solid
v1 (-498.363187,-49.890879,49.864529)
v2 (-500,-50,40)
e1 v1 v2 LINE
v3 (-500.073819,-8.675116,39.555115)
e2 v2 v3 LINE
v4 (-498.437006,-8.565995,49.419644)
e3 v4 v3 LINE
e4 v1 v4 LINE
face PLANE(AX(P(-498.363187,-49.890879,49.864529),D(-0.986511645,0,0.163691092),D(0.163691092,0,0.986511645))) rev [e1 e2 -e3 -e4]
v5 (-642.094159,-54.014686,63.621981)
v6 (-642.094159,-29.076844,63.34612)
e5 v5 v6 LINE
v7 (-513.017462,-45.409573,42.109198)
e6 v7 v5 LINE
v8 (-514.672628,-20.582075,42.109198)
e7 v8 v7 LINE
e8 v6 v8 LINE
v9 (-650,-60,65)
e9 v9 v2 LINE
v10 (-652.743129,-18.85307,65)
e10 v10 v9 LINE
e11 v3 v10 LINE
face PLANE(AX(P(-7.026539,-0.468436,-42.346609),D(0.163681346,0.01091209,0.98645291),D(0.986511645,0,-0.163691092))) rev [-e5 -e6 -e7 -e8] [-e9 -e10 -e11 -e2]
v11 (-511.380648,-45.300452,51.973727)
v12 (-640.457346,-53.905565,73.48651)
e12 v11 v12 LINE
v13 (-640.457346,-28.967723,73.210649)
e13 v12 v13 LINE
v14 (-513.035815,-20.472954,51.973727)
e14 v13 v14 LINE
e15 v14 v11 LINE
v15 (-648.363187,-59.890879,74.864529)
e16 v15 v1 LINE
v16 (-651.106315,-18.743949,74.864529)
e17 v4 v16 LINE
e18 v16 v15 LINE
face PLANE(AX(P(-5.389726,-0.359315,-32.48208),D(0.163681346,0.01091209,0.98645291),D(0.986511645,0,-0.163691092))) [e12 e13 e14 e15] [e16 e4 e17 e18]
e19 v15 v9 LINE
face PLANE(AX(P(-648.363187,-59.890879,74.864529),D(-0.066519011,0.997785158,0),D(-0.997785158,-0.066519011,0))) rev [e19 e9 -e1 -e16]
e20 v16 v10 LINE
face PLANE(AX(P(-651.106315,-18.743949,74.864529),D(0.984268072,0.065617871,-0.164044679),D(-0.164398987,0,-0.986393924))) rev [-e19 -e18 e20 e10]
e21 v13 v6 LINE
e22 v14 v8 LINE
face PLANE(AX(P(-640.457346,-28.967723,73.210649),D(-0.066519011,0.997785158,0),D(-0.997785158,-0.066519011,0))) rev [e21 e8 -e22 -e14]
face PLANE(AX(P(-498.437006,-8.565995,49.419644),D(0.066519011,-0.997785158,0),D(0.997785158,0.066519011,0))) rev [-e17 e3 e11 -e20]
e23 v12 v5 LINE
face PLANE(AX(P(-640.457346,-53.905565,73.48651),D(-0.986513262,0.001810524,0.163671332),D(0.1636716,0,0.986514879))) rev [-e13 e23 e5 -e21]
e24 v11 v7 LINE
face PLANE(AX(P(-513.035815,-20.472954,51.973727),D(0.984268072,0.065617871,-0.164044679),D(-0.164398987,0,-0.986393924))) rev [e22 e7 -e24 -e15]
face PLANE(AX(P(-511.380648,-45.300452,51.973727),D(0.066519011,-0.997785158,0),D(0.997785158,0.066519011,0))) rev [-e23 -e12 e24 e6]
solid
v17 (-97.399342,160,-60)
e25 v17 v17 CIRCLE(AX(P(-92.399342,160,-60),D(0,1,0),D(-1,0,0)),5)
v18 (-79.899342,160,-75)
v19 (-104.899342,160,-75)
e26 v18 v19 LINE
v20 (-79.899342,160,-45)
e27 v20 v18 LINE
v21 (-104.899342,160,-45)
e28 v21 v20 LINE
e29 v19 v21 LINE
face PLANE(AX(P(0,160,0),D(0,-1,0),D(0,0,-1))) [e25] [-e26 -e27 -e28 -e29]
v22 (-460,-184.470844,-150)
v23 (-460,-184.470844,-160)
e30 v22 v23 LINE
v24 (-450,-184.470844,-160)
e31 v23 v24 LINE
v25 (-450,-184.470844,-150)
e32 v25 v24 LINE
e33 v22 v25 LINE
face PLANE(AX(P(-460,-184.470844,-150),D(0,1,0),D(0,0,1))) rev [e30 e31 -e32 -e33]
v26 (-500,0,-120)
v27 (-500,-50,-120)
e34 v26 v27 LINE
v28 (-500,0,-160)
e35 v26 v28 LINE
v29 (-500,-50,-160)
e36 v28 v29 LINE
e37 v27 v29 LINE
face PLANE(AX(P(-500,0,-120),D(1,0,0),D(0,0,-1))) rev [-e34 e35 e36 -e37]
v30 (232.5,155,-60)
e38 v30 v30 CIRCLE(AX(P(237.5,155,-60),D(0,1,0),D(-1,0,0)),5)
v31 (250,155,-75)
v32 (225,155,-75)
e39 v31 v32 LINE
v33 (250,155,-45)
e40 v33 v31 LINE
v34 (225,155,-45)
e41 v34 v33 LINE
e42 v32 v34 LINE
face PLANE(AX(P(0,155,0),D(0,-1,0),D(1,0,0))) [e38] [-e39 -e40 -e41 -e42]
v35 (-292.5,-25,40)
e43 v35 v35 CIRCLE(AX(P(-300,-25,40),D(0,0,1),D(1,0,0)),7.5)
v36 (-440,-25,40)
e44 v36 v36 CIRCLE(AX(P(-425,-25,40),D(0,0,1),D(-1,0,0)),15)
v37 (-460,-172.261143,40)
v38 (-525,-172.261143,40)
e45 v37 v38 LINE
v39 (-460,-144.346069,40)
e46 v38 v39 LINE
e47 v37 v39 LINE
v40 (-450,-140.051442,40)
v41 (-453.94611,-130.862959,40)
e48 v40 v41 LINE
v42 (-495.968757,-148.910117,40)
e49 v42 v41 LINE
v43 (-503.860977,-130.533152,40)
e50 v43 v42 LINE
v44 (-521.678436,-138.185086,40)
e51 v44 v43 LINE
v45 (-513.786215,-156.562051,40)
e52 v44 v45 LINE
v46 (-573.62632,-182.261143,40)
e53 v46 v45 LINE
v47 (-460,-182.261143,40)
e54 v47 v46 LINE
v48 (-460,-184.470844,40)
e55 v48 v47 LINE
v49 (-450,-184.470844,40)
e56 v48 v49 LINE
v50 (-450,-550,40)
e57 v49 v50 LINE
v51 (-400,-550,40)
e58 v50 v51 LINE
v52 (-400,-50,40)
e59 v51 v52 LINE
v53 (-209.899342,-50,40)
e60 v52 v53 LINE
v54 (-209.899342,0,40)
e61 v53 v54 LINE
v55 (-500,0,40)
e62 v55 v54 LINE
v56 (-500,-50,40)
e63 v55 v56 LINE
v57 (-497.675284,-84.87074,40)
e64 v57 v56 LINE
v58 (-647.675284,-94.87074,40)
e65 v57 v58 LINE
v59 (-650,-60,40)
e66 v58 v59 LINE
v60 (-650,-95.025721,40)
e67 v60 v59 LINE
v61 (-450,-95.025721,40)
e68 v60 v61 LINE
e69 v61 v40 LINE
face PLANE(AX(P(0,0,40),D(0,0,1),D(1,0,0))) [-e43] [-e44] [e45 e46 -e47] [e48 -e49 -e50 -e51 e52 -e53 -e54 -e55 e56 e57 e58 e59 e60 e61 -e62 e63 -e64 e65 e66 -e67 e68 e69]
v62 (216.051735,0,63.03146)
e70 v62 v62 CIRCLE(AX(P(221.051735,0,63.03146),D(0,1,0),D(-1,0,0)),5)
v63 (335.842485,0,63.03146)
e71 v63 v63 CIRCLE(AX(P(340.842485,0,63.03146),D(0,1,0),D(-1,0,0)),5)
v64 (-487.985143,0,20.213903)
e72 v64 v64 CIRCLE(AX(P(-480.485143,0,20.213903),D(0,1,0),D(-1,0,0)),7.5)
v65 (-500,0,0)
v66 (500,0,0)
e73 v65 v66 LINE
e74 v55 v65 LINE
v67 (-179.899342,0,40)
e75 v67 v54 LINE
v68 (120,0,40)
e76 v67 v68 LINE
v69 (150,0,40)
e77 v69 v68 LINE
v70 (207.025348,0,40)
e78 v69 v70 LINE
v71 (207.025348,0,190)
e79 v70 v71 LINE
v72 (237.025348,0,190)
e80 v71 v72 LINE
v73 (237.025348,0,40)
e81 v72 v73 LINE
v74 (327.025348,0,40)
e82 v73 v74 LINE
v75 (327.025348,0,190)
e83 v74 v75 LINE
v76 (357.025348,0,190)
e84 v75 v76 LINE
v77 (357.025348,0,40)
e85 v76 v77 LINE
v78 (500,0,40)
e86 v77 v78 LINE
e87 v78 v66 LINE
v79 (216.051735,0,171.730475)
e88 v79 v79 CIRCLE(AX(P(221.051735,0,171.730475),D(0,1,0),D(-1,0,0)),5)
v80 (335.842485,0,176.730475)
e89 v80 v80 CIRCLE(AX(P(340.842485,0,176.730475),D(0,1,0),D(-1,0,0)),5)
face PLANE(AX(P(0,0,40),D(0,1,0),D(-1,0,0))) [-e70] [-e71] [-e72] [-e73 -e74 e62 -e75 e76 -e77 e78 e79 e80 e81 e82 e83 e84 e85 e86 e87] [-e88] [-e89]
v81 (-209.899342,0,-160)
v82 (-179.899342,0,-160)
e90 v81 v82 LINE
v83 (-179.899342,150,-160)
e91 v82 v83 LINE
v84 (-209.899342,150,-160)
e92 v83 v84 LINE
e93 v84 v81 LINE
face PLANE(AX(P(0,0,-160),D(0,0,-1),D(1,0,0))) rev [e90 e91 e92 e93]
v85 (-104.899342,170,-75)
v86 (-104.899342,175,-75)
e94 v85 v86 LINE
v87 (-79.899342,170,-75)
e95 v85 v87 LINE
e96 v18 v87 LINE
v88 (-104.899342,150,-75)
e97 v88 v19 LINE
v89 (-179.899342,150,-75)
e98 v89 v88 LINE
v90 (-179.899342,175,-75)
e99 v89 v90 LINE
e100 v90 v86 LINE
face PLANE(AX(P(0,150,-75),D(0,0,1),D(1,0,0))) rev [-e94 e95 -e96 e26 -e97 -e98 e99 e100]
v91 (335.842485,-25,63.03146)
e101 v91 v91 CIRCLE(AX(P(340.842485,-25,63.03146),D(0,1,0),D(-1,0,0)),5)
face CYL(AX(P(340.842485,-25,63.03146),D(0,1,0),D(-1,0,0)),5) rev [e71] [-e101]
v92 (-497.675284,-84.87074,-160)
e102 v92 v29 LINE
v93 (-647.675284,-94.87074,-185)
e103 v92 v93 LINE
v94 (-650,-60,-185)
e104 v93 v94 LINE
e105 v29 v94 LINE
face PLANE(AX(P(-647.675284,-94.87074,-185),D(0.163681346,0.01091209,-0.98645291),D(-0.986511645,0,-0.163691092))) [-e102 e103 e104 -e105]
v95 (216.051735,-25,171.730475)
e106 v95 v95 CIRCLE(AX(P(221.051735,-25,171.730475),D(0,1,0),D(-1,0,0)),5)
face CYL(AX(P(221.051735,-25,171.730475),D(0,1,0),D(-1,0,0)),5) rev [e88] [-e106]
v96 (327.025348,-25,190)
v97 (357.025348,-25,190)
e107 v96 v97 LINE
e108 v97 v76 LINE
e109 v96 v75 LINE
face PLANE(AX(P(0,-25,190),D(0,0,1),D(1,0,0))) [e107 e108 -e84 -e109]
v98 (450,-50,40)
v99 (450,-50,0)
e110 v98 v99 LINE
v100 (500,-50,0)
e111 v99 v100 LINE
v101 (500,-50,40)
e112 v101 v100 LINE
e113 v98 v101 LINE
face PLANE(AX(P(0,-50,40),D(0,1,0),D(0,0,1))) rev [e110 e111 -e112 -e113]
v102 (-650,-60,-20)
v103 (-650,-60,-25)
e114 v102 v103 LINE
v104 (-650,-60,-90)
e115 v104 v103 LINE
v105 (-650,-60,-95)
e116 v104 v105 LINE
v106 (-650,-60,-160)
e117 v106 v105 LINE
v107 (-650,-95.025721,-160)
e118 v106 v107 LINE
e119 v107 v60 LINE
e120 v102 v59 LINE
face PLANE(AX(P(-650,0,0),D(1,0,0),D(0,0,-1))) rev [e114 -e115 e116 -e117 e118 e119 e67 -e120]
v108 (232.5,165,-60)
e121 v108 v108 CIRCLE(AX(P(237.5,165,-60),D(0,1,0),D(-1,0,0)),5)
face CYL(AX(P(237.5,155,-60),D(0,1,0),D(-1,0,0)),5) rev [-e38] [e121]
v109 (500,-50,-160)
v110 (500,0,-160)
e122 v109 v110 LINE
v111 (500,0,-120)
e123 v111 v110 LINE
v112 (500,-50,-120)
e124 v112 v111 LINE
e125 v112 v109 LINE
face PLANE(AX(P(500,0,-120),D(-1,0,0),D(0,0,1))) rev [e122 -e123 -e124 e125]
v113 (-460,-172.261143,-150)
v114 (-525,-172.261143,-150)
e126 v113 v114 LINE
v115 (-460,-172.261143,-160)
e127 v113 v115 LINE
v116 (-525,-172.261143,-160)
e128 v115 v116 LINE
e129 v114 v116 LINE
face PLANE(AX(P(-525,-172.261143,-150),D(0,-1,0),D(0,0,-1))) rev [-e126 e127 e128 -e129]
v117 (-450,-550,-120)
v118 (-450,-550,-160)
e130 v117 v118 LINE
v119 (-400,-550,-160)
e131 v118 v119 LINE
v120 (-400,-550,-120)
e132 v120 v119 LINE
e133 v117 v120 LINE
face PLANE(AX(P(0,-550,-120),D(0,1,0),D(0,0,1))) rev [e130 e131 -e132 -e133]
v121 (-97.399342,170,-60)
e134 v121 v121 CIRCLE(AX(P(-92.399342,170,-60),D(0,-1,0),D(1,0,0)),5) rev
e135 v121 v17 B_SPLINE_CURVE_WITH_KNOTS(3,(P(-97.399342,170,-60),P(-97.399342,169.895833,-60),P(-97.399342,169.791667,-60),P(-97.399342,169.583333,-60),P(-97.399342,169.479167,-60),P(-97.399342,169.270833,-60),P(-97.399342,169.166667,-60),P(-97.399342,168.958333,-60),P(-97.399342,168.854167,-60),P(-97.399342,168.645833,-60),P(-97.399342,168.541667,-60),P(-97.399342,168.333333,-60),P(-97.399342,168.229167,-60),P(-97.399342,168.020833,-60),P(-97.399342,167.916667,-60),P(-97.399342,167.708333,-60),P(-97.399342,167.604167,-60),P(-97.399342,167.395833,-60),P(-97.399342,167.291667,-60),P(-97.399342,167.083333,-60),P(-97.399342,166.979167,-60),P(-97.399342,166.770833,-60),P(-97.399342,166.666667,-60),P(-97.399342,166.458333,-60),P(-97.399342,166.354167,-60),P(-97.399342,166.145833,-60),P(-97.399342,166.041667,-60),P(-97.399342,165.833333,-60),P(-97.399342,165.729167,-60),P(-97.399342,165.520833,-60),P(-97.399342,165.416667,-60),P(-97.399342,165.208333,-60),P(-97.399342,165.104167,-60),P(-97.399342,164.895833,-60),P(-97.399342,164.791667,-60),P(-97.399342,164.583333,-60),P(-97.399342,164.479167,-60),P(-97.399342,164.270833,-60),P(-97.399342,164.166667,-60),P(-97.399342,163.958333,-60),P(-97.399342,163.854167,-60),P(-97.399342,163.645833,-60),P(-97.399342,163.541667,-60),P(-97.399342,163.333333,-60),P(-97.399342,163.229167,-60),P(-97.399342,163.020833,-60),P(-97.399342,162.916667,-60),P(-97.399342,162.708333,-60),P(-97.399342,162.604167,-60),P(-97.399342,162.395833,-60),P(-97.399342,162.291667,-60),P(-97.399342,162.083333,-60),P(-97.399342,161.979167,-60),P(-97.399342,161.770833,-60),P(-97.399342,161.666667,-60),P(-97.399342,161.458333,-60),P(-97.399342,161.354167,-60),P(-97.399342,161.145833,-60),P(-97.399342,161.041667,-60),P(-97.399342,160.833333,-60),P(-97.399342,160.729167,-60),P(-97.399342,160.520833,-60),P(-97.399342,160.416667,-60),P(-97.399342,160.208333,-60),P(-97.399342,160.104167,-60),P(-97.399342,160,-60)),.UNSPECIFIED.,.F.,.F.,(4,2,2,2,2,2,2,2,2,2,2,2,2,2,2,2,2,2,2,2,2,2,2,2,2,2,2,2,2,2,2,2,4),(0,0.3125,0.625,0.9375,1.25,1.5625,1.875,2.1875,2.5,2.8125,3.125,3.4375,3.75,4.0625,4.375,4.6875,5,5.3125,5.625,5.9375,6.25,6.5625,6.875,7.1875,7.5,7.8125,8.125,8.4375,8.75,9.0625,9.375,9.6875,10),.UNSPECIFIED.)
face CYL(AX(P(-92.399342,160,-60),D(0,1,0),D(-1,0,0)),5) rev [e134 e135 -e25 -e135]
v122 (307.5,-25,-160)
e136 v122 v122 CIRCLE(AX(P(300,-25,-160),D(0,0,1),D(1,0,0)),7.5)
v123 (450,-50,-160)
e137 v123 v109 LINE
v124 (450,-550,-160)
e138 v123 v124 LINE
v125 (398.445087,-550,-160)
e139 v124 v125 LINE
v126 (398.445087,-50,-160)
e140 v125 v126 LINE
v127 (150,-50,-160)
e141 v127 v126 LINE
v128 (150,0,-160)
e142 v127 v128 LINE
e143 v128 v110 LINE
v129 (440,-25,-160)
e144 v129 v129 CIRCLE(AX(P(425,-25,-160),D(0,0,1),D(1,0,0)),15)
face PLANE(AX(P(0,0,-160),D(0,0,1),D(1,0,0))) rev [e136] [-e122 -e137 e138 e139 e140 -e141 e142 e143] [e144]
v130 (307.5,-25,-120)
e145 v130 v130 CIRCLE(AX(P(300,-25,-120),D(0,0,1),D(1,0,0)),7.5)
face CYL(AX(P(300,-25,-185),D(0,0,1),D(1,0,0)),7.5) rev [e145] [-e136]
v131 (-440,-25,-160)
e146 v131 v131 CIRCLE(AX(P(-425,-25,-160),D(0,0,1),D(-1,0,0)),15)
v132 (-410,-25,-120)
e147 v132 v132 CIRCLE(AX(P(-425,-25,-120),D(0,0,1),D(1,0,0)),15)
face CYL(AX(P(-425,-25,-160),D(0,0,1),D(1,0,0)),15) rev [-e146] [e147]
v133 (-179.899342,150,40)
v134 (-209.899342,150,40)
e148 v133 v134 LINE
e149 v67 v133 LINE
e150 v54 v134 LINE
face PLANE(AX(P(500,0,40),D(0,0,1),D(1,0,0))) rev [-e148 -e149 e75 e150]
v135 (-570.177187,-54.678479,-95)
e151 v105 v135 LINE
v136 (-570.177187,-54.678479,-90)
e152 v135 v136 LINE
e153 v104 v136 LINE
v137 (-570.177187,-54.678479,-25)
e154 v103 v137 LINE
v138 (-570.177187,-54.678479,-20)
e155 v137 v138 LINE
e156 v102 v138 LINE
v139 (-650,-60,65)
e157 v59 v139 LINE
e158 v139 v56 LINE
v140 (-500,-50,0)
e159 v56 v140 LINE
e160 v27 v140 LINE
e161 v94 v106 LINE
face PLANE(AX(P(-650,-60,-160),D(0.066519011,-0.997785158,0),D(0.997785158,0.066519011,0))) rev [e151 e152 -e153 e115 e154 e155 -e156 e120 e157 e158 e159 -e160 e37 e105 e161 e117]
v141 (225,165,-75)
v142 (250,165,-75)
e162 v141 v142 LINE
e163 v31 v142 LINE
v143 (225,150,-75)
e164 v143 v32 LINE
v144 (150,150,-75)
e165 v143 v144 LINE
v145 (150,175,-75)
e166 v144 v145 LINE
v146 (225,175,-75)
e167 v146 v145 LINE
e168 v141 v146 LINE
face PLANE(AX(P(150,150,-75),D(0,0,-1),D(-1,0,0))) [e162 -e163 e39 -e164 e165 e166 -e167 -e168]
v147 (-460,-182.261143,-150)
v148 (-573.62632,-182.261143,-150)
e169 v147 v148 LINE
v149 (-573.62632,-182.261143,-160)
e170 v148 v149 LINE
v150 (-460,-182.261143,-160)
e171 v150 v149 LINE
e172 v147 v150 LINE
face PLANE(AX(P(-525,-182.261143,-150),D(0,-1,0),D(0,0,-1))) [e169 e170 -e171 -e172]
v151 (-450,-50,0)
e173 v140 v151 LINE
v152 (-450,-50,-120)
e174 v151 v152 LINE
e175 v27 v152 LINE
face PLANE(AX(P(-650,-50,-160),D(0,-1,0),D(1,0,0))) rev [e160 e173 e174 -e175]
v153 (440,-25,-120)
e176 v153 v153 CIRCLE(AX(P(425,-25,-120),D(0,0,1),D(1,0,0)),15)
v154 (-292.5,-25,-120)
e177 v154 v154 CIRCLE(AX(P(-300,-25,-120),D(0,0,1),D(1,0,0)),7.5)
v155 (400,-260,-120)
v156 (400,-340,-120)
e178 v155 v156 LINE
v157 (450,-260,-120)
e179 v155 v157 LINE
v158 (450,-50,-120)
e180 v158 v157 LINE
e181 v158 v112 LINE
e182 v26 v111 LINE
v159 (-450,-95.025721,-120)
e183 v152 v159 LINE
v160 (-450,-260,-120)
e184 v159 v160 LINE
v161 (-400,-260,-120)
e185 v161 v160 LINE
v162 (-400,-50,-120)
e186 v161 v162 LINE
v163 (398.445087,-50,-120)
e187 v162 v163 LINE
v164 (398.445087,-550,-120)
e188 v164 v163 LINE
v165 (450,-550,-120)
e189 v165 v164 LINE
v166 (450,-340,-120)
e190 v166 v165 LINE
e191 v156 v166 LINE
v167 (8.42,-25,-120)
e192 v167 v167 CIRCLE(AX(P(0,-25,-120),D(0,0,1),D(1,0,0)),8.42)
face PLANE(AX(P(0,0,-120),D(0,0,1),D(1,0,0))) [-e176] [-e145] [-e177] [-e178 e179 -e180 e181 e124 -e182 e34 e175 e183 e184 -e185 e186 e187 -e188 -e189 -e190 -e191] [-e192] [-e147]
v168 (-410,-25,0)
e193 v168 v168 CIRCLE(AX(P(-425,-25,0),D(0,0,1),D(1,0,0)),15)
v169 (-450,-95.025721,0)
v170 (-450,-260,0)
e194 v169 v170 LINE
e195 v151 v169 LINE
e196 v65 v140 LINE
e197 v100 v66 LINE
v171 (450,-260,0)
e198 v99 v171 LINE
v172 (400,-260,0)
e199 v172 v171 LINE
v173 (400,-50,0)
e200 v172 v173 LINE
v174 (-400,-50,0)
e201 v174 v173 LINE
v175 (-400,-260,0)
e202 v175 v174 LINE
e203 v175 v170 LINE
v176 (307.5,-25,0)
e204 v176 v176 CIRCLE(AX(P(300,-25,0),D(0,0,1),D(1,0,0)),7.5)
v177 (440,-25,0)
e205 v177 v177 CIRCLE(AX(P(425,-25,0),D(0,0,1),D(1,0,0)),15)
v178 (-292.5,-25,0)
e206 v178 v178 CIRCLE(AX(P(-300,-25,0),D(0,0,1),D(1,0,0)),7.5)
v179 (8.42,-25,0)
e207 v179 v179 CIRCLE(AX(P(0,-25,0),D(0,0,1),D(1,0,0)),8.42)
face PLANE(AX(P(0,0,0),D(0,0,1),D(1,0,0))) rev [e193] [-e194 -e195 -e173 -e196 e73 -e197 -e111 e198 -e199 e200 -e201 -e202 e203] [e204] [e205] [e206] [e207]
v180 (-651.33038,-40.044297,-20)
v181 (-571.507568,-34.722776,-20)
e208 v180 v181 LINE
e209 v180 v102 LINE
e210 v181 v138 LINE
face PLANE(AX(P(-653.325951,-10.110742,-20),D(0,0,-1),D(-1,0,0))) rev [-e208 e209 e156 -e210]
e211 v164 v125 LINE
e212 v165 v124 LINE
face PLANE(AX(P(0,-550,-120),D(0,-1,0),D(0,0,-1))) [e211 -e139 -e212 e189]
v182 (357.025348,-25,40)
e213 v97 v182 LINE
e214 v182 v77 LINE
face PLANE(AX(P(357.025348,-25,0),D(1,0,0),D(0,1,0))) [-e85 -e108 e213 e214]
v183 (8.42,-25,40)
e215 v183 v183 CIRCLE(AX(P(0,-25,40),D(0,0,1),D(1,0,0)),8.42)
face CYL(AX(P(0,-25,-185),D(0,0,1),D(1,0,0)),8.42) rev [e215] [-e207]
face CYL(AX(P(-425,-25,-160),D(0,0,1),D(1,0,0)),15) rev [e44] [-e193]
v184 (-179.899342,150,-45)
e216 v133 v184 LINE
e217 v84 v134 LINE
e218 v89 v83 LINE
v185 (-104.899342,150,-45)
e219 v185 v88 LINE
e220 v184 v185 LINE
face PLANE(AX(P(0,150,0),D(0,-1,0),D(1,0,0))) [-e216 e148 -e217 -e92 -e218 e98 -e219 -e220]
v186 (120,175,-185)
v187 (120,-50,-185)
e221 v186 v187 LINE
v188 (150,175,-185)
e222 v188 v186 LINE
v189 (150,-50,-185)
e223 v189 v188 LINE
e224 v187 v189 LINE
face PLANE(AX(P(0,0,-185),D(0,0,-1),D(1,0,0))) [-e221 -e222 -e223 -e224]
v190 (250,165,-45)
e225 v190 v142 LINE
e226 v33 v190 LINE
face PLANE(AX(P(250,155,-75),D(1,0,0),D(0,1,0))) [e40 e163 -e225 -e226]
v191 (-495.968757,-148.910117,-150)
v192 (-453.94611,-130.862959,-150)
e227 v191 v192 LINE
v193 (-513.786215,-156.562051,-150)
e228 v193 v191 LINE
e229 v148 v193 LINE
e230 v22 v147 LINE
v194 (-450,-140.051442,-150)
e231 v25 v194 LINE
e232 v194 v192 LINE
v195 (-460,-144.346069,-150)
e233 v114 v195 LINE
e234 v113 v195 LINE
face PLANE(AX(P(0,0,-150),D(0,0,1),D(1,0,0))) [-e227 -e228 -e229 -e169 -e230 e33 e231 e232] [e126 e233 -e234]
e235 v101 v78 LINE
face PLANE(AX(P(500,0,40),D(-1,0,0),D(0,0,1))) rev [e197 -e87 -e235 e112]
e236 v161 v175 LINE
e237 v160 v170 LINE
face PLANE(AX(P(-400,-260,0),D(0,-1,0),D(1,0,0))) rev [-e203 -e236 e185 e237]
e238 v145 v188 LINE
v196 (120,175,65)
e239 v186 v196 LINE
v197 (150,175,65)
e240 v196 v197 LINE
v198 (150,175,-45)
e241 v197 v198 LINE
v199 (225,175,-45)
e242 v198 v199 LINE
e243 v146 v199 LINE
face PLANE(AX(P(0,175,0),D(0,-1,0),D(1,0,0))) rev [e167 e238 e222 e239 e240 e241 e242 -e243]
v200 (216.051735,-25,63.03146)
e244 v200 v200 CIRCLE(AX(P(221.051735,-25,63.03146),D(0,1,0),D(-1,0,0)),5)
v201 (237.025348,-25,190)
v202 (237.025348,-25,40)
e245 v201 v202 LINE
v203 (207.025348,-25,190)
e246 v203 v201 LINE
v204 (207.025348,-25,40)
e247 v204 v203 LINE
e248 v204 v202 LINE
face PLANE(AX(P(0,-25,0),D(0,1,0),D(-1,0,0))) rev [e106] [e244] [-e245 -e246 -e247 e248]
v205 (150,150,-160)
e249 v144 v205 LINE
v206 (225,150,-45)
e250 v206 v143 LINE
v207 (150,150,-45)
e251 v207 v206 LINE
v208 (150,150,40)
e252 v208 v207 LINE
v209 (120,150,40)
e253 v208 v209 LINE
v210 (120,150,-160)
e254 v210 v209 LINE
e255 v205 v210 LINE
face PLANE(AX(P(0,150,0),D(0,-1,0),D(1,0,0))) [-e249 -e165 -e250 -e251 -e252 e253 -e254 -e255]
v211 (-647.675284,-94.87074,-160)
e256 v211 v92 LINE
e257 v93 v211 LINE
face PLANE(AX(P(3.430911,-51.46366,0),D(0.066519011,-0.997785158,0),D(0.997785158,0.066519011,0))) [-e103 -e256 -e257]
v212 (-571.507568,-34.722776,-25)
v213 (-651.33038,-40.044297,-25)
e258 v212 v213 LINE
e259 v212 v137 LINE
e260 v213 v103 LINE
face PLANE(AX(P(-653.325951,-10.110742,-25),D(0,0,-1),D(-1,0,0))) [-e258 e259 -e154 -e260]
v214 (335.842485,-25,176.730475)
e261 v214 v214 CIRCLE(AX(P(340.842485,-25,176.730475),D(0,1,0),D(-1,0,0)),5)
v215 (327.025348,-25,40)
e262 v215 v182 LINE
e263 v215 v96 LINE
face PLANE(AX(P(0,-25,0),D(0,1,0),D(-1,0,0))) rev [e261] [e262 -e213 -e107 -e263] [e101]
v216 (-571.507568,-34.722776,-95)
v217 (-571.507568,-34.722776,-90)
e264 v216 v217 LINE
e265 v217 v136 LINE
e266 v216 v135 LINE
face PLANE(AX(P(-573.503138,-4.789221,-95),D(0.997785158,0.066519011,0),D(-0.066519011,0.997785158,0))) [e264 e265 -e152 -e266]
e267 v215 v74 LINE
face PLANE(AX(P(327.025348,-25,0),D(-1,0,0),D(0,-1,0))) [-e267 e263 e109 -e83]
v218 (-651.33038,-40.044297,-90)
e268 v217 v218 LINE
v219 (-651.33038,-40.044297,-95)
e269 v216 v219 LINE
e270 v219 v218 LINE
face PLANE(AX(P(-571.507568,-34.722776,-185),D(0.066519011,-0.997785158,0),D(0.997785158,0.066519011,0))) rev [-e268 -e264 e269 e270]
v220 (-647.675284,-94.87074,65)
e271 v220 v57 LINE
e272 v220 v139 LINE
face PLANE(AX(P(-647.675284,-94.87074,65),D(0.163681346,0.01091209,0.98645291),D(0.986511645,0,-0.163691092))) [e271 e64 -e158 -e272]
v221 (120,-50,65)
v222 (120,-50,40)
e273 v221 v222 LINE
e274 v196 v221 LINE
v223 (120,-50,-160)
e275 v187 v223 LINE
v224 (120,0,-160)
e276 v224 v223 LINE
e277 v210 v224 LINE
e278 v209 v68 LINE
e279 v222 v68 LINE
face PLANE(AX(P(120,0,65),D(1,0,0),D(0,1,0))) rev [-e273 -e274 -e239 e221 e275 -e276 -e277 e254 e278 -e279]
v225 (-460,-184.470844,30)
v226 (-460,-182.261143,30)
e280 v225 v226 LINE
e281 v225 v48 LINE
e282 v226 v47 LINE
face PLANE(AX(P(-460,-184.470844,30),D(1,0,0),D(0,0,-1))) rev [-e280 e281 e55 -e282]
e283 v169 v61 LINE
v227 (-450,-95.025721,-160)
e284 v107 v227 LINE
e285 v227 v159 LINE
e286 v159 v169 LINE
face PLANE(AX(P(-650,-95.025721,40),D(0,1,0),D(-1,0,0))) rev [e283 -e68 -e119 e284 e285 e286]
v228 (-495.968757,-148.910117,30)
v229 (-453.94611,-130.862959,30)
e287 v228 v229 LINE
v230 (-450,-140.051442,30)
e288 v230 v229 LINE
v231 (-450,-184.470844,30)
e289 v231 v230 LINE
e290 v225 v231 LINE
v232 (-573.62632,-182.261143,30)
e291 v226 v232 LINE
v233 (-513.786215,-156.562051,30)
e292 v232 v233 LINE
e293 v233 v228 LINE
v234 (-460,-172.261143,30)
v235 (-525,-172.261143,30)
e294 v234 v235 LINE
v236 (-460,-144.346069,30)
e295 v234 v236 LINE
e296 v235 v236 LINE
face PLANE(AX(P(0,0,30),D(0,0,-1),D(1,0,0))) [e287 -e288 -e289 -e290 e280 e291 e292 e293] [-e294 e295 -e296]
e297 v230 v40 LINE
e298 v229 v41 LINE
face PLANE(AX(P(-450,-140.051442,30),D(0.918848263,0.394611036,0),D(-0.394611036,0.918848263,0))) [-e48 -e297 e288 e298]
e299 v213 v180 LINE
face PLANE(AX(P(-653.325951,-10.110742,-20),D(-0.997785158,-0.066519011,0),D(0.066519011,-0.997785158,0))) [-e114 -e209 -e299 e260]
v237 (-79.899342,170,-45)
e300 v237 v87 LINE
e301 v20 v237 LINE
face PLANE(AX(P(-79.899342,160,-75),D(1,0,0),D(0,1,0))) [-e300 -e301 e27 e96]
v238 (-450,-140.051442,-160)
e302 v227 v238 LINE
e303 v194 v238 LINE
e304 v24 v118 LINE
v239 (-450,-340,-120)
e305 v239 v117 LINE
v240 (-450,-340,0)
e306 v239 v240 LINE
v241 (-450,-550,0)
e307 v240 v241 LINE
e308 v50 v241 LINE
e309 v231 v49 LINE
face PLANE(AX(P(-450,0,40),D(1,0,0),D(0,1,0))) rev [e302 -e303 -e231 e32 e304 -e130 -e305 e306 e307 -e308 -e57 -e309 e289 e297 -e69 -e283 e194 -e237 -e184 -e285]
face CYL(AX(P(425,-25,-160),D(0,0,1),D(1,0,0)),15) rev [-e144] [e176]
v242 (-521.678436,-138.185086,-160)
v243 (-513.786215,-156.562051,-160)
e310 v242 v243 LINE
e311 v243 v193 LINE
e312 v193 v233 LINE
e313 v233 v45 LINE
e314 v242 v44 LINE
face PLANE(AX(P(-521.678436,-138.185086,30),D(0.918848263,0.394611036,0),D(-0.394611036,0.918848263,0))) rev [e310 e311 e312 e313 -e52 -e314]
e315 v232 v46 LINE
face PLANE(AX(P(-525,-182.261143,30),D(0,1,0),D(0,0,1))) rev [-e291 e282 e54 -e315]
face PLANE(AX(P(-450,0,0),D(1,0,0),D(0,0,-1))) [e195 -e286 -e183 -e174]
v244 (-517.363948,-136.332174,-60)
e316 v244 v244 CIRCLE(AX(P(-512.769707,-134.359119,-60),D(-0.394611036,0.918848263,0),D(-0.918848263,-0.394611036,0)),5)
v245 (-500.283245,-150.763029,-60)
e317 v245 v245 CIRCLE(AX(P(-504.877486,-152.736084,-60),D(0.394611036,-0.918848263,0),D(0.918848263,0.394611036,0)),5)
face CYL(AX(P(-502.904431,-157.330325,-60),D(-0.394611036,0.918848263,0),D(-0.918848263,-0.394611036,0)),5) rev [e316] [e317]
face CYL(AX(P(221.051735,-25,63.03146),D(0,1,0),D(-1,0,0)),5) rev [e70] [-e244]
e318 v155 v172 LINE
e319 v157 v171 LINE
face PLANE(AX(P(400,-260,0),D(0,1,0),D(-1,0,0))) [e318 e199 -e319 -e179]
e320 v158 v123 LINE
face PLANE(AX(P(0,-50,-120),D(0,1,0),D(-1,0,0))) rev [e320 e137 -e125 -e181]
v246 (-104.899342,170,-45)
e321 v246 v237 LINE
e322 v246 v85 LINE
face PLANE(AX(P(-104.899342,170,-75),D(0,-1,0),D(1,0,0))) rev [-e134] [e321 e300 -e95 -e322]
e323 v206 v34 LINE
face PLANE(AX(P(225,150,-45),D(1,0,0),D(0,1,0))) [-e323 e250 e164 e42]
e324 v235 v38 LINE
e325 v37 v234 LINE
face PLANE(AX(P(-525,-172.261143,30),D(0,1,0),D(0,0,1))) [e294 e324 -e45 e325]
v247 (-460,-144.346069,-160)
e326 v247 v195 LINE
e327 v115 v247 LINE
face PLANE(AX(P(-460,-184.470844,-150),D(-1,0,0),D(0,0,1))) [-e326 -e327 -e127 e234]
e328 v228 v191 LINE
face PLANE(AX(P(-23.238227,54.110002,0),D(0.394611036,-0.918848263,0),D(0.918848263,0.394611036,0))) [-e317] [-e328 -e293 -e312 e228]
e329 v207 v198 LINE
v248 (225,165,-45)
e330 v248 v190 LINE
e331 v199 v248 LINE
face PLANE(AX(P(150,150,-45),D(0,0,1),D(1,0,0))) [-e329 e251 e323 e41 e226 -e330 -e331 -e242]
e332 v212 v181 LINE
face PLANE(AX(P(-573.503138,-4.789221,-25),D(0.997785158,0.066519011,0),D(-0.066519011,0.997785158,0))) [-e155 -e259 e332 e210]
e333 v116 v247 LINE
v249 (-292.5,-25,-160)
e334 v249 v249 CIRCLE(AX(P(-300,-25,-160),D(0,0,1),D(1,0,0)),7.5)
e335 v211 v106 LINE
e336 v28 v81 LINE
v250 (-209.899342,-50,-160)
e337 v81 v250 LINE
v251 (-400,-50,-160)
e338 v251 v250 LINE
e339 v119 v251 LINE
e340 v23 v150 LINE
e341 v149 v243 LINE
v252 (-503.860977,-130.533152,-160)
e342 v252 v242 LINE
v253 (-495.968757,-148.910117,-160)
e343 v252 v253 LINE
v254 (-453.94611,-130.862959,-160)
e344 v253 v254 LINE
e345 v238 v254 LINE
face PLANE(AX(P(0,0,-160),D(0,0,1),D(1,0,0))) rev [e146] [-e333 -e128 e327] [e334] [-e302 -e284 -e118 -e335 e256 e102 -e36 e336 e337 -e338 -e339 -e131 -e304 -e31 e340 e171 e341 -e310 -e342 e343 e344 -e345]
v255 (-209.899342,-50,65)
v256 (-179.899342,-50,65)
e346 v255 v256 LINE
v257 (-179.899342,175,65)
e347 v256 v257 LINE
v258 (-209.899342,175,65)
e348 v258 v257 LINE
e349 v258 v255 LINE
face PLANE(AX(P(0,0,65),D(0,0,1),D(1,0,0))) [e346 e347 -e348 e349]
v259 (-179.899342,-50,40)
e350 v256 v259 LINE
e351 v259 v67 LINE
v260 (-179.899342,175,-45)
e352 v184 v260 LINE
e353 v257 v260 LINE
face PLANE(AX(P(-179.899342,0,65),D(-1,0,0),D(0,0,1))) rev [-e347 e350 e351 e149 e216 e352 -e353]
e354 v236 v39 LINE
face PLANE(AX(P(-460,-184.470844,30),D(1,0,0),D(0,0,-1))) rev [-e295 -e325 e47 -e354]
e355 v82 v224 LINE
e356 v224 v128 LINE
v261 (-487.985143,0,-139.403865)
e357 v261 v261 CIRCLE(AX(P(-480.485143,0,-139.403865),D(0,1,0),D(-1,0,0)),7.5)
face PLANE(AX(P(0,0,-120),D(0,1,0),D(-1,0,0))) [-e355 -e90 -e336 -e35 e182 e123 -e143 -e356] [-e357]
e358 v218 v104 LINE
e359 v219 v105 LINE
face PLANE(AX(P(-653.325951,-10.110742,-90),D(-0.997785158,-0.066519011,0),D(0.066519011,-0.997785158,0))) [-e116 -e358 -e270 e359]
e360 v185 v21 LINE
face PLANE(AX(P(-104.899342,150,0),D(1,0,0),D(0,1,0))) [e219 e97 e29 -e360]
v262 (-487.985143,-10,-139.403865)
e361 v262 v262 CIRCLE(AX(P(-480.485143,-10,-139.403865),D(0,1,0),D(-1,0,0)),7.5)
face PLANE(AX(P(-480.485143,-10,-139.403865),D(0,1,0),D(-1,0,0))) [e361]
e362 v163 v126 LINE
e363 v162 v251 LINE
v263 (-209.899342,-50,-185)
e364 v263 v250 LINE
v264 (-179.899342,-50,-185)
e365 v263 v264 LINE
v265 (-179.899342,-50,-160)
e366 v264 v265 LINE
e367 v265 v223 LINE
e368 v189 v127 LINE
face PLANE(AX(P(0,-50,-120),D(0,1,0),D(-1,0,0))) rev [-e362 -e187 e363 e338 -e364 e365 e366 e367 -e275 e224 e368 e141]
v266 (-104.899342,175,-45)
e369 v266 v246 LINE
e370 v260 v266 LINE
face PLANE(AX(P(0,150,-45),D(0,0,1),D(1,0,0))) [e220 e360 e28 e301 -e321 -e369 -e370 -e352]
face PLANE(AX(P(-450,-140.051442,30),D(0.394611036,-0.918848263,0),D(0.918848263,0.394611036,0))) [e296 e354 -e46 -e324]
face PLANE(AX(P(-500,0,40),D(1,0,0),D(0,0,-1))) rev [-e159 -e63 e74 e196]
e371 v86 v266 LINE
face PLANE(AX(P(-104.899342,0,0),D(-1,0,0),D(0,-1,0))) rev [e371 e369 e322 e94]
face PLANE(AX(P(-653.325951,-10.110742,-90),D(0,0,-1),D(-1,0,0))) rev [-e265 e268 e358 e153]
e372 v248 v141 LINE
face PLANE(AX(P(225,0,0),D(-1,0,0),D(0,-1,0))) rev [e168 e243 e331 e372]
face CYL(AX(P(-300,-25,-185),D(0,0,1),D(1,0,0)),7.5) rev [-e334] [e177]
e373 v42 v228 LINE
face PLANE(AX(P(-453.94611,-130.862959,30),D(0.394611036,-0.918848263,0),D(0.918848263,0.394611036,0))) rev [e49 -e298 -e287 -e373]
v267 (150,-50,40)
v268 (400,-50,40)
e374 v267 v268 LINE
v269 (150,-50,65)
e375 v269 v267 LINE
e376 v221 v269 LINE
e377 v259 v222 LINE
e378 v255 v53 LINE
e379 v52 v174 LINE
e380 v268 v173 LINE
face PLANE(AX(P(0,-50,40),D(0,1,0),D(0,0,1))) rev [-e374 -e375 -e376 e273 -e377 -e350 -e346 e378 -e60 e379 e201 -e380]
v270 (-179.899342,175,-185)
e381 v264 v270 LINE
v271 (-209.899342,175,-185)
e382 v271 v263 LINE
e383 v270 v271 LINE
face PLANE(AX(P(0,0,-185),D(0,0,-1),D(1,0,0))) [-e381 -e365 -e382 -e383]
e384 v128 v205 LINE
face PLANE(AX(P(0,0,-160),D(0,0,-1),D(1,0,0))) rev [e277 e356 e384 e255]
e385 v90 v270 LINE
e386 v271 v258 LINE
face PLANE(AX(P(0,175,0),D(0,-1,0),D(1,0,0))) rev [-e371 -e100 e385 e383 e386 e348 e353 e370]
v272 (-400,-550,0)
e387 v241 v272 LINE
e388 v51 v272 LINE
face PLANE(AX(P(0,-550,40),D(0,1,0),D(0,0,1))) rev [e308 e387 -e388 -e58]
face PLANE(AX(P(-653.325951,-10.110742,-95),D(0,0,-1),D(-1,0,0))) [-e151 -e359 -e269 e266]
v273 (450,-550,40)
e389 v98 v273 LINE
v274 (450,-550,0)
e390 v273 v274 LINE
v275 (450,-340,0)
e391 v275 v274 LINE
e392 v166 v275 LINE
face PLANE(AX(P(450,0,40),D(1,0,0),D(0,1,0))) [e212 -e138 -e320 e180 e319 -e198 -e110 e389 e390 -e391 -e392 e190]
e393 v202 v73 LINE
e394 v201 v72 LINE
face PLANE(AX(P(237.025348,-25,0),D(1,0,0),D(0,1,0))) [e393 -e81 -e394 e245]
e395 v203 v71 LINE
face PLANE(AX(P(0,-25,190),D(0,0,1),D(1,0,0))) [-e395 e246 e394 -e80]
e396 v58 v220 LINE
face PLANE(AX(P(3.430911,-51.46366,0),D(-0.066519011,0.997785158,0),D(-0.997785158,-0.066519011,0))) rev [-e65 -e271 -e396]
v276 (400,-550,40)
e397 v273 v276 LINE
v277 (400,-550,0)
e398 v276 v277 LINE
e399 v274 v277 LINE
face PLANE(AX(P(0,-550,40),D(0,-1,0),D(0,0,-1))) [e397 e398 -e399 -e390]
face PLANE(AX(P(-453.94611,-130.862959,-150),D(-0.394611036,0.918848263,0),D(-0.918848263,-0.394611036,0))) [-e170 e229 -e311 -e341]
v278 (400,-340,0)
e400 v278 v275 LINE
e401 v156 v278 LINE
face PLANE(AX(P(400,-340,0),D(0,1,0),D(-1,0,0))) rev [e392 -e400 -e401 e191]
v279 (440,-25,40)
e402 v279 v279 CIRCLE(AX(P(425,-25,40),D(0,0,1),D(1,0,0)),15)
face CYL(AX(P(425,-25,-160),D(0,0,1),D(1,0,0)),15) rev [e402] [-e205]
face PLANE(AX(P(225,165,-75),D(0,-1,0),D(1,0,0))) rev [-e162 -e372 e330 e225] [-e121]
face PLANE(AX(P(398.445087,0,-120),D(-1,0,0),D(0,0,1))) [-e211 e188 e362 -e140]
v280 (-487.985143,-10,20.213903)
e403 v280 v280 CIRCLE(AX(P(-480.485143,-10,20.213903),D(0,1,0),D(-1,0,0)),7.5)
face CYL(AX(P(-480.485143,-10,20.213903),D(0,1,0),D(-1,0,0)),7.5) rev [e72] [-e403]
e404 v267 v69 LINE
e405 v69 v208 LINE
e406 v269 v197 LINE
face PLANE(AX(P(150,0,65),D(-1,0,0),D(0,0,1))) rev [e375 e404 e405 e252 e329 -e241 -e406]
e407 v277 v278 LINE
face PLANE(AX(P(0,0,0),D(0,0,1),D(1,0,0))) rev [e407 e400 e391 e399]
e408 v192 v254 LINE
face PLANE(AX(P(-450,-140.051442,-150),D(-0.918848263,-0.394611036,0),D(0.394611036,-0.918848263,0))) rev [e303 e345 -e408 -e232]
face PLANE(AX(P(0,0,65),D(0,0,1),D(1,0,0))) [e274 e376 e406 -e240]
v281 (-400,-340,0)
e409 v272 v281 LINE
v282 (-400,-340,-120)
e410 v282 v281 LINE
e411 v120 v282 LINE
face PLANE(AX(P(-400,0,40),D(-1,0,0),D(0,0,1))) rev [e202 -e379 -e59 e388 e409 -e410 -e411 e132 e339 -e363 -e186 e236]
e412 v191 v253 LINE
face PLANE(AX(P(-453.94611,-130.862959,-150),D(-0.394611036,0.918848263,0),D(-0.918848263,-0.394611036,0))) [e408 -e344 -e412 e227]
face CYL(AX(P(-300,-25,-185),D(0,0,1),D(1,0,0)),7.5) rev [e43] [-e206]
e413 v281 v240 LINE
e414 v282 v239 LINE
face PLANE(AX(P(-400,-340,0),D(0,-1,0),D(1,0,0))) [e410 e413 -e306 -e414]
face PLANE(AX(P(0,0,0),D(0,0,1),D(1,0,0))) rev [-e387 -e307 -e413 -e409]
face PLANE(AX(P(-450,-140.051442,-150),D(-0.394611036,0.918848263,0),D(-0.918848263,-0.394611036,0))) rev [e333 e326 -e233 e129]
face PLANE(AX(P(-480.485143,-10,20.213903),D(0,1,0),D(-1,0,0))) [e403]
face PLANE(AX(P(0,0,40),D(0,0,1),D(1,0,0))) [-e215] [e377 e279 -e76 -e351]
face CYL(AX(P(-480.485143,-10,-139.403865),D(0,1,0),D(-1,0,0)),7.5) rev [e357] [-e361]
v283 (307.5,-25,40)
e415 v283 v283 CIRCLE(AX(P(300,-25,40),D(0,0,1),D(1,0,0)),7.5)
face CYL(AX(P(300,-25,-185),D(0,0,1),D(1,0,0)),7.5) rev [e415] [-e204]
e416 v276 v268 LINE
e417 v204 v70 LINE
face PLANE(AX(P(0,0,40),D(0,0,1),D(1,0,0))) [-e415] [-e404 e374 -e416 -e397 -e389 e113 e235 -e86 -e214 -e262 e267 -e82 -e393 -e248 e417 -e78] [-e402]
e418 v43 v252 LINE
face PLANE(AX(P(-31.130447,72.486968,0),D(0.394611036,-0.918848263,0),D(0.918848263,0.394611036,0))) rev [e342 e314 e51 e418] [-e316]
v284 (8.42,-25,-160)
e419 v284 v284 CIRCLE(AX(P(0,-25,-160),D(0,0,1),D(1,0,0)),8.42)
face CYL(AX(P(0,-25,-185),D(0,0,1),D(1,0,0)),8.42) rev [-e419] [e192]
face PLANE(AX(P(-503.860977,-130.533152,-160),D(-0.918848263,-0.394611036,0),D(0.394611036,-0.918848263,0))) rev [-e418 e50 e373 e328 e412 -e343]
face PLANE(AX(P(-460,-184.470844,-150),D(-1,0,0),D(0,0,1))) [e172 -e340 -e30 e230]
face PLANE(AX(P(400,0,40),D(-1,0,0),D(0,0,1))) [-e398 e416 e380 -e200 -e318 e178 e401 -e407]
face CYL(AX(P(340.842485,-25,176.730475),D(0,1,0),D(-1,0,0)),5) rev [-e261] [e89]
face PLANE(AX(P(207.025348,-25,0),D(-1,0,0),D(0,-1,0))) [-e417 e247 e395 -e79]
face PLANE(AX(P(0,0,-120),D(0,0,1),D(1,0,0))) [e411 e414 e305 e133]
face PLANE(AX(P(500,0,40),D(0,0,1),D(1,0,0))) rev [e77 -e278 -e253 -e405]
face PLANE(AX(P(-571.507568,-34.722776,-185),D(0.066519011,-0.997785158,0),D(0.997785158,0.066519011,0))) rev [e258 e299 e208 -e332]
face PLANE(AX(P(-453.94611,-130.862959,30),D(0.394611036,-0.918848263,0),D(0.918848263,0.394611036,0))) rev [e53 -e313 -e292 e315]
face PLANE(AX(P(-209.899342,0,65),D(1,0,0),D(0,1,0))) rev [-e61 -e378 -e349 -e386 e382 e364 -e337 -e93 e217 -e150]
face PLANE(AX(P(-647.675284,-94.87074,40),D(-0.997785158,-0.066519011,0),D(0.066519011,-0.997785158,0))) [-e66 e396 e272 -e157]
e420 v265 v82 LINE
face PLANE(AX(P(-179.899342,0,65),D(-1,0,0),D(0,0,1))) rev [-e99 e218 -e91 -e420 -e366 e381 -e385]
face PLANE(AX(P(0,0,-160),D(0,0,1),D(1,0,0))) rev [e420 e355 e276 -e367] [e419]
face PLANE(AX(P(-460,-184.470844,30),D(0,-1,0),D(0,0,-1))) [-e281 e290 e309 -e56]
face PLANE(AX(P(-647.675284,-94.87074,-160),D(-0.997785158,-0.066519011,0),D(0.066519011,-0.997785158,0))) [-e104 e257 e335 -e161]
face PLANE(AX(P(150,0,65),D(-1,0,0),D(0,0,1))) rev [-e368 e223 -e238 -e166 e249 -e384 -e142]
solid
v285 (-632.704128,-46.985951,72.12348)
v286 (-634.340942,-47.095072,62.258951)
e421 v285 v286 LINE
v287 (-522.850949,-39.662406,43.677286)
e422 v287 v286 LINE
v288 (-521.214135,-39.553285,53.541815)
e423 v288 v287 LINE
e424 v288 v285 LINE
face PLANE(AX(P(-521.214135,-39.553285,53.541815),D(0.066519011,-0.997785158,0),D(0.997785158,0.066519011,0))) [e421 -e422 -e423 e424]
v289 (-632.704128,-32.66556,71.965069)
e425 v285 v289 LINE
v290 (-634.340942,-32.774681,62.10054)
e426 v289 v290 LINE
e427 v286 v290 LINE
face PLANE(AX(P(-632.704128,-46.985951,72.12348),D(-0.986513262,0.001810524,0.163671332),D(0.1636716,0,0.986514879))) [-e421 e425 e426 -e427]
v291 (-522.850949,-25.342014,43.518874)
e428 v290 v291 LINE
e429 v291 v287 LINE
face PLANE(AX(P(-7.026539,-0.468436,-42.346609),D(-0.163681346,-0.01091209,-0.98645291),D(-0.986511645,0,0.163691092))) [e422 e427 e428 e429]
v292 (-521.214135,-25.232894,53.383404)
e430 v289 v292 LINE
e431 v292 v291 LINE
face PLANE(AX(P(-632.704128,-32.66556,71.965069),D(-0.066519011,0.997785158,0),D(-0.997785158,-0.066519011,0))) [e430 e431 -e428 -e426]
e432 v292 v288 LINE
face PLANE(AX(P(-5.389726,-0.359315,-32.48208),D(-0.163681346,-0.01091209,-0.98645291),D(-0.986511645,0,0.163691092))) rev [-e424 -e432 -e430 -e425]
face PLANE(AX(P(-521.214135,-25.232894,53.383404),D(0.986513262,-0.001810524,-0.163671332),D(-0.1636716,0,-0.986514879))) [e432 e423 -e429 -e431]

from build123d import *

# Parameters (mm, degrees)
CROQUIS1_W                 = 1000
CROQUIS1_H                 = 50
CROQUIS1_W_2               = 50
CROQUIS1_H_2               = 500
SALIENTE_EXTRUIR1_DEPTH    = 40
CROQUIS3_W                 = 51.55491286
CROQUIS3_H                 = 500
CROQUIS3_W_2               = 1000
CROQUIS3_H_2               = 50
CROQUIS3_W_3               = 50
SALIENTE_EXTRUIR2_DEPTH    = 40
CROQUIS4_W                 = 120
CROQUIS4_H                 = 40
SALIENTE_EXTRUIR3_DEPTH    = 50
SIMETR_A5_START            = 400
SIMETR_A5_OUTLINE_W        = 80
SIMETR_A5_OUTLINE_H        = 120
SIMETR_A5_DEPTH            = 50
SIMETR_A5_START_2          = -450
SIMETR_A5_2_OUTLINE_W      = 40
SIMETR_A5_2_OUTLINE_H      = 120
SIMETR_A5_2_DEPTH          = 50
CROQUIS6_R                 = 15
CORTAR_EXTRUIR2_DEPTH      = 770.740215917
CROQUIS7_W                 = 30
CROQUIS7_H                 = 150
CROQUIS7_R                 = 5
SALIENTE_EXTRUIR7_DEPTH    = 25
CROQUIS8_W                 = 30
CROQUIS8_H                 = 150
CROQUIS8_H_2               = 50
SALIENTE_EXTRUIR8_DEPTH    = 25
SIMETR_A6_START            = -50
SIMETR_A6_OUTLINE_W        = 30
SIMETR_A6_OUTLINE_H        = 25
SIMETR_A6_DEPTH            = 200
CROQUIS9_W                 = 25
CROQUIS9_H                 = 150
CORTAR_EXTRUIR3_DEPTH      = 918.909077881
CROQUIS10_W                = 30
CROQUIS10_H                = 250
SALIENTE_EXTRUIR9_DEPTH    = 25
CROQUIS11_W                = 75
CROQUIS11_H                = 30
SALIENTE_EXTRUIR10_DEPTH   = 25
CROQUIS13_W                = 25
CROQUIS13_H                = 30
SALIENTE_EXTRUIR12_DEPTH   = 20
CROQUIS14_W                = 30
CROQUIS14_H                = 10
CORTAR_EXTRUIR5_DEPTH      = 25
CROQUIS15_R                = 5
CORTAR_EXTRUIR6_DEPTH      = 10
EXTRUIR_L_MINA1_START      = -10
EXTRUIR_L_MINA1_DEPTH      = 10
SALIENTE_EXTRUIR13_DEPTH   = 20
CROQUIS19_W                = 75
CROQUIS19_H                = 30
SALIENTE_EXTRUIR14_DEPTH   = 25
CROQUIS20_W                = 25
CROQUIS20_H                = 30
CROQUIS20_R                = 5
SALIENTE_EXTRUIR15_DEPTH   = 15
CROQUIS21_W                = 30
CROQUIS21_H                = 5
CORTAR_EXTRUIR7_DEPTH      = 25
CROQUIS22_R                = 5
CORTAR_EXTRUIR8_DEPTH      = 25
CROQUIS24_R                = 7.5
CROQUIS24_R_2              = 8.42
CORTAR_EXTRUIR9_DEPTH      = 826.937137629
CROQUIS25_W                = 200
CROQUIS25_H                = 45.025720895
SALIENTE_EXTRUIR16_DEPTH   = 200
CORTAR_EXTRUIR10_DEPTH     = 200
CROQUIS27_R                = 7.5
CORTAR_EXTRUIR11_DEPTH     = 10
SALIENTE_EXTRUIR17_DEPTH   = 34.948144
SALIENTE_EXTRUIR18_DEPTH   = 10
SALIENTE_EXTRUIR18_2_DEPTH = 10
CROQUIS31_W                = 80
CROQUIS31_H                = 5
EXTRUIR_L_MINA3_DEPTH      = 50
CORTAR_EXTRUIR12_DEPTH     = 880.451418574


# Read off the part's stored shape, not the designer's step: Simetría5, Simetría6, Extruir-Lámina1
with BuildPart() as part:
    # Croquis1 → Saliente-Extruir1 (new body)
    with BuildSketch(Plane.XY):
        with Locations((0, -25)):
            Rectangle(CROQUIS1_W, CROQUIS1_H)
        with Locations((-425, -300)):
            Rectangle(CROQUIS1_W_2, CROQUIS1_H_2)
        with Locations((425, -300)):
            Rectangle(CROQUIS1_W_2, CROQUIS1_H_2)
    extrude(amount=SALIENTE_EXTRUIR1_DEPTH)



with BuildPart() as body_2:
    # Croquis3 → Saliente-Extruir2 (new body)
    with BuildSketch(Plane.XY.offset(-160)):
        with Locations((424.22254357, -300)):
            Rectangle(CROQUIS3_W, CROQUIS3_H)
        with Locations((0, -25)):
            Rectangle(CROQUIS3_W_2, CROQUIS3_H_2)
        with Locations((-425, -300)):
            Rectangle(CROQUIS3_W_3, CROQUIS3_H)
    extrude(amount=SALIENTE_EXTRUIR2_DEPTH)


with BuildPart() as part_1:
    add(part.part)

    add(body_2.part)  # Saliente-Extruir3 merges body 2
    # Croquis4 → Saliente-Extruir3 (add)
    with BuildSketch(Plane.ZY.offset(450)):
        with Locations((-60, -320)):
            Rectangle(CROQUIS4_W, CROQUIS4_H)
    extrude(amount=-SALIENTE_EXTRUIR3_DEPTH)

    # Simetría5 outline → Simetría5 (add)
    with BuildSketch(Plane.YZ.offset(SIMETR_A5_START)):
        with Locations((-300, -60)):
            Rectangle(SIMETR_A5_OUTLINE_W, SIMETR_A5_OUTLINE_H)
    extrude(amount=SIMETR_A5_DEPTH)

    # Simetr_a5 2 outline → Simetr_a5 2 (add)
    with BuildSketch(Plane.YZ.offset(SIMETR_A5_START_2)):
        with Locations((-280, -60)):
            Rectangle(SIMETR_A5_2_OUTLINE_W, SIMETR_A5_2_OUTLINE_H)
    extrude(amount=SIMETR_A5_2_DEPTH)

    # Croquis6 → Cortar-Extruir2 (cut, through all)
    with BuildSketch(Plane.XY.offset(40)):
        with Locations((425, -25)):
            Circle(CROQUIS6_R)
        with Locations((-425, -25)):
            Circle(CROQUIS6_R)
    extrude(amount=-CORTAR_EXTRUIR2_DEPTH, mode=Mode.SUBTRACT)

    # Croquis7 → Saliente-Extruir7 (add)
    # profile 1 of 2: a face of its own
    with BuildSketch(Plane(origin=(0, 0, 0), x_dir=(1, 0, 0), z_dir=(0, 1, 0))):
        with Locations((222.02534833, -115)):
            Rectangle(CROQUIS7_W, CROQUIS7_H)
        with Locations(Location((221.051734852, -171.73047465, 0), (0, 0, 180))):
            Circle(CROQUIS7_R, mode=Mode.SUBTRACT)
        with Locations(Location((221.051734852, -63.031460394, 0), (0, 0, 180))):
            Circle(CROQUIS7_R, mode=Mode.SUBTRACT)
    # profile 2 of 2: a face of its own
    with BuildSketch(Plane(origin=(0, 0, 0), x_dir=(1, 0, 0), z_dir=(0, 1, 0))):
        with Locations((342.02534833, -115)):
            Rectangle(CROQUIS7_W, CROQUIS7_H)
        with Locations(Location((340.842485257, -176.73047465, 0), (0, 0, 180))):
            Circle(CROQUIS7_R, mode=Mode.SUBTRACT)
        with Locations(Location((340.842485257, -63.031460394, 0), (0, 0, 180))):
            Circle(CROQUIS7_R, mode=Mode.SUBTRACT)
    extrude(amount=-SALIENTE_EXTRUIR7_DEPTH)

    # Croquis8 → Saliente-Extruir8 (add)
    with BuildSketch(Plane.XY.offset(40)):
        with Locations((-194.899341637, 75)):
            Rectangle(CROQUIS8_W, CROQUIS8_H)
        with Locations((135, 75)):
            Rectangle(CROQUIS8_W, CROQUIS8_H)
        Polygon((120, -50), (120.100658363, -50), (150, -50), (150, 0), (120, 0), align=None)
        with Locations((-194.899341637, -25)):
            Rectangle(CROQUIS8_W, CROQUIS8_H_2)
    extrude(amount=SALIENTE_EXTRUIR8_DEPTH)

    # Simetría6 outline → Simetría6 (add)
    with BuildSketch(Plane(origin=(0, 0, 0), x_dir=(1, 0, 0), z_dir=(0, 1, 0)).offset(SIMETR_A6_START)):
        with Locations((-194.899341637, -27.5)):
            Rectangle(SIMETR_A6_OUTLINE_W, SIMETR_A6_OUTLINE_H)
        with Locations((-194.899341637, 172.5)):
            Rectangle(SIMETR_A6_OUTLINE_W, SIMETR_A6_OUTLINE_H)
        with Locations((135, -27.5)):
            Rectangle(SIMETR_A6_OUTLINE_W, SIMETR_A6_OUTLINE_H)
        with Locations((135, 172.5)):
            Rectangle(SIMETR_A6_OUTLINE_W, SIMETR_A6_OUTLINE_H)
    extrude(amount=SIMETR_A6_DEPTH)

    # Croquis9 → Cortar-Extruir3 (cut, through all)
    with BuildSketch(Plane.ZY.offset(209.899341637)):
        with Locations((27.5, 75)):
            Rectangle(CROQUIS9_W, CROQUIS9_H)
    extrude(amount=-CORTAR_EXTRUIR3_DEPTH, mode=Mode.SUBTRACT)

    # Croquis10 → Saliente-Extruir9 (add)
    with BuildSketch(Plane(origin=(0, 150, 0), x_dir=(1, 0, 0), z_dir=(0, 1, 0))):
        with Locations((-194.899341637, 60)):
            Rectangle(CROQUIS10_W, CROQUIS10_H)
        with Locations((135, 60)):
            Rectangle(CROQUIS10_W, CROQUIS10_H)
    extrude(amount=SALIENTE_EXTRUIR9_DEPTH)

    # Croquis11 → Saliente-Extruir10 (add)
    with BuildSketch(Plane(origin=(0, 175, 0), x_dir=(1, 0, 0), z_dir=(0, 1, 0))):
        with Locations((187.5, 60)):
            Rectangle(CROQUIS11_W, CROQUIS11_H)
    extrude(amount=-SALIENTE_EXTRUIR10_DEPTH)

    # Croquis13 → Saliente-Extruir12 (add)
    with BuildSketch(Plane(origin=(0, 175, 0), x_dir=(1, 0, 0), z_dir=(0, 1, 0))):
        with Locations((237.5, 60)):
            Rectangle(CROQUIS13_W, CROQUIS13_H)
    extrude(amount=-SALIENTE_EXTRUIR12_DEPTH)

    # Croquis14 → Cortar-Extruir5 (cut)
    with BuildSketch(Plane(origin=(250, 0, 0), x_dir=(0, 0, -1), z_dir=(1, 0, 0))):
        with Locations((60, 170)):
            Rectangle(CROQUIS14_W, CROQUIS14_H)
    extrude(amount=-CORTAR_EXTRUIR5_DEPTH, mode=Mode.SUBTRACT)

    # Croquis15 → Cortar-Extruir6 (cut)
    with BuildSketch(Plane(origin=(0, 165, 0), x_dir=(1, 0, 0), z_dir=(0, 1, 0))):
        with Locations(Location((237.5, 60, 0), (0, 0, 180))):
            Circle(CROQUIS15_R)
    extrude(amount=-CORTAR_EXTRUIR6_DEPTH, mode=Mode.SUBTRACT)

    # Extruir-Lámina1 outline → Extruir-Lámina1 (add)
    with BuildSketch(Plane(origin=(0, 0, -160), x_dir=(-1, 0, 0), z_dir=(0, 0, -1)).offset(EXTRUIR_L_MINA1_START)):
        Polygon((450, -184.470843572), (460, -184.470843572), (460, -182.261142681), (573.626320277, -182.261142681), (453.946110361, -130.862959161), (450, -140.05144179), align=None)
        Polygon((525, -172.261142681), (460, -172.261142681), (460, -144.346068575), align=None, mode=Mode.SUBTRACT)
    extruir_l_mina1 = extrude(amount=EXTRUIR_L_MINA1_DEPTH)

    # Simetría7: Extruir-Lámina1 across plane
    add(extruir_l_mina1.mirror(Plane.XY.offset(-60)))

    # Croquis18 → Saliente-Extruir13 (add)
    with BuildSketch(Plane(origin=(-23.238226525, 54.110002303, 0), x_dir=(0.9188482628553936, 0.39461103614524734, 0), z_dir=(-0.3946110361452473, 0.9188482628553934, 0))):
        Polygon((-533.87268456, 150), (-533.87268456, -30), (-533.87268456, -40), (-514.481606186, -40), (-514.481606186, -30), (-514.481606186, 150), (-514.481606186, 160), (-533.87268456, 160), align=None)
    extrude(amount=SALIENTE_EXTRUIR13_DEPTH)

    # Croquis19 → Saliente-Extruir14 (add)
    with BuildSketch(Plane(origin=(0, 175, 0), x_dir=(1, 0, 0), z_dir=(0, 1, 0))):
        with Locations((-142.399341637, 60)):
            Rectangle(CROQUIS19_W, CROQUIS19_H)
    extrude(amount=-SALIENTE_EXTRUIR14_DEPTH)

    # Croquis20 → Saliente-Extruir15 (add)
    with BuildSketch(Plane(origin=(0, 175, 0), x_dir=(1, 0, 0), z_dir=(0, 1, 0))):
        with Locations((-92.399341637, 60)):
            Rectangle(CROQUIS20_W, CROQUIS20_H)
        with Locations(Location((-92.399341637, 60, 0), (0, 0, 180))):
            Circle(CROQUIS20_R, mode=Mode.SUBTRACT)
    extrude(amount=-SALIENTE_EXTRUIR15_DEPTH)

    # Croquis21 → Cortar-Extruir7 (cut)
    with BuildSketch(Plane(origin=(-79.899341637, 0, 0), x_dir=(0, 0, -1), z_dir=(1, 0, 0))):
        with Locations((60, 172.5)):
            Rectangle(CROQUIS21_W, CROQUIS21_H)
    extrude(amount=-CORTAR_EXTRUIR7_DEPTH, mode=Mode.SUBTRACT)

    # Croquis22 → Cortar-Extruir8 (cut)
    with BuildSketch(Plane(origin=(-31.130447248, 72.48696756, 0), x_dir=(0.9188482628553936, 0.39461103614524734, 0), z_dir=(-0.3946110361452473, 0.9188482628553934, 0))):
        with Locations(Location((-524.177145373, 60, 0), (0, 0, 180))):
            Circle(CROQUIS22_R)
    extrude(amount=-CORTAR_EXTRUIR8_DEPTH, mode=Mode.SUBTRACT)

    # Croquis24 → Cortar-Extruir9 (cut, through all)
    with BuildSketch(Plane.XY.offset(40)):
        with Locations((-300, -25)):
            Circle(CROQUIS24_R)
        with Locations((0, -25)):
            Circle(CROQUIS24_R_2)
        with Locations((300, -25)):
            Circle(CROQUIS24_R)
    extrude(amount=-CORTAR_EXTRUIR9_DEPTH, mode=Mode.SUBTRACT)

    # Croquis25 → Saliente-Extruir16 (add)
    with BuildSketch(Plane.ZY.offset(450)):
        with Locations((-60, -72.512860448)):
            Rectangle(CROQUIS25_W, CROQUIS25_H)
    extrude(amount=SALIENTE_EXTRUIR16_DEPTH)

    # Croquis26 → Cortar-Extruir10 (cut)
    with BuildSketch(Plane.XY.offset(40)):
        Polygon((-650, -50), (-650, -60), (-500, -50), align=None)
    extrude(amount=-CORTAR_EXTRUIR10_DEPTH, mode=Mode.SUBTRACT)

    # Croquis27 → Cortar-Extruir11 (cut)
    with BuildSketch(Plane(origin=(0, 0, 0), x_dir=(1, 0, 0), z_dir=(0, 1, 0))):
        with Locations(Location((-480.485143318, 139.403864671, 0), (0, 0, 180))):
            Circle(CROQUIS27_R)
        with Locations(Location((-480.485143318, -20.213903124, 0), (0, 0, 180))):
            Circle(CROQUIS27_R)
    extrude(amount=-CORTAR_EXTRUIR11_DEPTH, mode=Mode.SUBTRACT)

    # Croquis28 → Saliente-Extruir17 (add)
    with BuildSketch(Plane(origin=(1.10619469, -16.592920354, 0), x_dir=(0.997785157856609, 0.06651901052377408, 0), z_dir=(-0.06651901052377408, 0.997785157856609, 0))):
        Polygon((-652.551493238, 160), (-652.551493238, 185), (-502.218529454, 160), align=None)
        Polygon((-652.551493238, -40), (-652.551493238, -65), (-502.218529454, -40), align=None)
    extrude(amount=-SALIENTE_EXTRUIR17_DEPTH)

    # Croquis31 → Extruir-Lámina3 (add)
    with BuildSketch(Plane(origin=(1.10619469, -16.592920354, 0), x_dir=(0.997785157856609, 0.06651901052377408, 0), z_dir=(-0.06651901052377408, 0.997785157856609, 0))):
        with Locations((-612.551493238, 22.5)):
            Rectangle(CROQUIS31_W, CROQUIS31_H)
        with Locations((-612.551493238, 92.5)):
            Rectangle(CROQUIS31_W, CROQUIS31_H)
    extrude(amount=EXTRUIR_L_MINA3_DEPTH)

    # Croquis33 → Cortar-Extruir12 (cut, through all)
    with BuildSketch(Plane.XY.offset(-20)):
        Polygon((-653.325950526, -10.110742107), (-573.503137898, -4.789221265), (-571.507567582, -34.722776001), (-651.33038021, -40.044296843), align=None)
    extrude(amount=-CORTAR_EXTRUIR12_DEPTH, mode=Mode.SUBTRACT)


with BuildPart() as body_2_2:
    # Croquis29 → Saliente-Extruir18 (new body)
    with BuildSketch(Plane(origin=(-7.026539147, -0.468435943, -42.346609257), x_dir=(0.9865132624966768, -0.0018105235842012348, -0.1636713320117914), z_dir=(0.1636813456633437, 0.010912089710889604, 0.9864529098644185))):
        Polygon((-651.763625789, -60.715311897), (-499.71295835, -50.43939192), (-499.787786937, -9.112114788), (-654.54425611, -19.570898823), align=None)
        Polygon((-643.749703116, -29.775753354), (-514.586177994, -21.046597012), (-512.908383516, -45.872575681), (-643.749703116, -54.715121081), align=None, mode=Mode.SUBTRACT)
    extrude(amount=SALIENTE_EXTRUIR18_DEPTH)


with BuildPart() as body_3:
    # Croquis29 → Saliente-Extruir18 2 (new body)
    with BuildSketch(Plane(origin=(-7.026539147, -0.468435943, -42.346609257), x_dir=(0.9865132624966768, -0.0018105235842012348, -0.1636713320117914), z_dir=(0.1636813456633437, 0.010912089710889604, 0.9864529098644185))):
        Polygon((-635.890490528, -33.459586346), (-522.87630528, -25.821838065), (-522.87630528, -40.14310536), (-635.890490528, -47.780853641), align=None)
    extrude(amount=SALIENTE_EXTRUIR18_2_DEPTH)


solid = Compound([part_1.part, body_2_2.part, body_3.part])
